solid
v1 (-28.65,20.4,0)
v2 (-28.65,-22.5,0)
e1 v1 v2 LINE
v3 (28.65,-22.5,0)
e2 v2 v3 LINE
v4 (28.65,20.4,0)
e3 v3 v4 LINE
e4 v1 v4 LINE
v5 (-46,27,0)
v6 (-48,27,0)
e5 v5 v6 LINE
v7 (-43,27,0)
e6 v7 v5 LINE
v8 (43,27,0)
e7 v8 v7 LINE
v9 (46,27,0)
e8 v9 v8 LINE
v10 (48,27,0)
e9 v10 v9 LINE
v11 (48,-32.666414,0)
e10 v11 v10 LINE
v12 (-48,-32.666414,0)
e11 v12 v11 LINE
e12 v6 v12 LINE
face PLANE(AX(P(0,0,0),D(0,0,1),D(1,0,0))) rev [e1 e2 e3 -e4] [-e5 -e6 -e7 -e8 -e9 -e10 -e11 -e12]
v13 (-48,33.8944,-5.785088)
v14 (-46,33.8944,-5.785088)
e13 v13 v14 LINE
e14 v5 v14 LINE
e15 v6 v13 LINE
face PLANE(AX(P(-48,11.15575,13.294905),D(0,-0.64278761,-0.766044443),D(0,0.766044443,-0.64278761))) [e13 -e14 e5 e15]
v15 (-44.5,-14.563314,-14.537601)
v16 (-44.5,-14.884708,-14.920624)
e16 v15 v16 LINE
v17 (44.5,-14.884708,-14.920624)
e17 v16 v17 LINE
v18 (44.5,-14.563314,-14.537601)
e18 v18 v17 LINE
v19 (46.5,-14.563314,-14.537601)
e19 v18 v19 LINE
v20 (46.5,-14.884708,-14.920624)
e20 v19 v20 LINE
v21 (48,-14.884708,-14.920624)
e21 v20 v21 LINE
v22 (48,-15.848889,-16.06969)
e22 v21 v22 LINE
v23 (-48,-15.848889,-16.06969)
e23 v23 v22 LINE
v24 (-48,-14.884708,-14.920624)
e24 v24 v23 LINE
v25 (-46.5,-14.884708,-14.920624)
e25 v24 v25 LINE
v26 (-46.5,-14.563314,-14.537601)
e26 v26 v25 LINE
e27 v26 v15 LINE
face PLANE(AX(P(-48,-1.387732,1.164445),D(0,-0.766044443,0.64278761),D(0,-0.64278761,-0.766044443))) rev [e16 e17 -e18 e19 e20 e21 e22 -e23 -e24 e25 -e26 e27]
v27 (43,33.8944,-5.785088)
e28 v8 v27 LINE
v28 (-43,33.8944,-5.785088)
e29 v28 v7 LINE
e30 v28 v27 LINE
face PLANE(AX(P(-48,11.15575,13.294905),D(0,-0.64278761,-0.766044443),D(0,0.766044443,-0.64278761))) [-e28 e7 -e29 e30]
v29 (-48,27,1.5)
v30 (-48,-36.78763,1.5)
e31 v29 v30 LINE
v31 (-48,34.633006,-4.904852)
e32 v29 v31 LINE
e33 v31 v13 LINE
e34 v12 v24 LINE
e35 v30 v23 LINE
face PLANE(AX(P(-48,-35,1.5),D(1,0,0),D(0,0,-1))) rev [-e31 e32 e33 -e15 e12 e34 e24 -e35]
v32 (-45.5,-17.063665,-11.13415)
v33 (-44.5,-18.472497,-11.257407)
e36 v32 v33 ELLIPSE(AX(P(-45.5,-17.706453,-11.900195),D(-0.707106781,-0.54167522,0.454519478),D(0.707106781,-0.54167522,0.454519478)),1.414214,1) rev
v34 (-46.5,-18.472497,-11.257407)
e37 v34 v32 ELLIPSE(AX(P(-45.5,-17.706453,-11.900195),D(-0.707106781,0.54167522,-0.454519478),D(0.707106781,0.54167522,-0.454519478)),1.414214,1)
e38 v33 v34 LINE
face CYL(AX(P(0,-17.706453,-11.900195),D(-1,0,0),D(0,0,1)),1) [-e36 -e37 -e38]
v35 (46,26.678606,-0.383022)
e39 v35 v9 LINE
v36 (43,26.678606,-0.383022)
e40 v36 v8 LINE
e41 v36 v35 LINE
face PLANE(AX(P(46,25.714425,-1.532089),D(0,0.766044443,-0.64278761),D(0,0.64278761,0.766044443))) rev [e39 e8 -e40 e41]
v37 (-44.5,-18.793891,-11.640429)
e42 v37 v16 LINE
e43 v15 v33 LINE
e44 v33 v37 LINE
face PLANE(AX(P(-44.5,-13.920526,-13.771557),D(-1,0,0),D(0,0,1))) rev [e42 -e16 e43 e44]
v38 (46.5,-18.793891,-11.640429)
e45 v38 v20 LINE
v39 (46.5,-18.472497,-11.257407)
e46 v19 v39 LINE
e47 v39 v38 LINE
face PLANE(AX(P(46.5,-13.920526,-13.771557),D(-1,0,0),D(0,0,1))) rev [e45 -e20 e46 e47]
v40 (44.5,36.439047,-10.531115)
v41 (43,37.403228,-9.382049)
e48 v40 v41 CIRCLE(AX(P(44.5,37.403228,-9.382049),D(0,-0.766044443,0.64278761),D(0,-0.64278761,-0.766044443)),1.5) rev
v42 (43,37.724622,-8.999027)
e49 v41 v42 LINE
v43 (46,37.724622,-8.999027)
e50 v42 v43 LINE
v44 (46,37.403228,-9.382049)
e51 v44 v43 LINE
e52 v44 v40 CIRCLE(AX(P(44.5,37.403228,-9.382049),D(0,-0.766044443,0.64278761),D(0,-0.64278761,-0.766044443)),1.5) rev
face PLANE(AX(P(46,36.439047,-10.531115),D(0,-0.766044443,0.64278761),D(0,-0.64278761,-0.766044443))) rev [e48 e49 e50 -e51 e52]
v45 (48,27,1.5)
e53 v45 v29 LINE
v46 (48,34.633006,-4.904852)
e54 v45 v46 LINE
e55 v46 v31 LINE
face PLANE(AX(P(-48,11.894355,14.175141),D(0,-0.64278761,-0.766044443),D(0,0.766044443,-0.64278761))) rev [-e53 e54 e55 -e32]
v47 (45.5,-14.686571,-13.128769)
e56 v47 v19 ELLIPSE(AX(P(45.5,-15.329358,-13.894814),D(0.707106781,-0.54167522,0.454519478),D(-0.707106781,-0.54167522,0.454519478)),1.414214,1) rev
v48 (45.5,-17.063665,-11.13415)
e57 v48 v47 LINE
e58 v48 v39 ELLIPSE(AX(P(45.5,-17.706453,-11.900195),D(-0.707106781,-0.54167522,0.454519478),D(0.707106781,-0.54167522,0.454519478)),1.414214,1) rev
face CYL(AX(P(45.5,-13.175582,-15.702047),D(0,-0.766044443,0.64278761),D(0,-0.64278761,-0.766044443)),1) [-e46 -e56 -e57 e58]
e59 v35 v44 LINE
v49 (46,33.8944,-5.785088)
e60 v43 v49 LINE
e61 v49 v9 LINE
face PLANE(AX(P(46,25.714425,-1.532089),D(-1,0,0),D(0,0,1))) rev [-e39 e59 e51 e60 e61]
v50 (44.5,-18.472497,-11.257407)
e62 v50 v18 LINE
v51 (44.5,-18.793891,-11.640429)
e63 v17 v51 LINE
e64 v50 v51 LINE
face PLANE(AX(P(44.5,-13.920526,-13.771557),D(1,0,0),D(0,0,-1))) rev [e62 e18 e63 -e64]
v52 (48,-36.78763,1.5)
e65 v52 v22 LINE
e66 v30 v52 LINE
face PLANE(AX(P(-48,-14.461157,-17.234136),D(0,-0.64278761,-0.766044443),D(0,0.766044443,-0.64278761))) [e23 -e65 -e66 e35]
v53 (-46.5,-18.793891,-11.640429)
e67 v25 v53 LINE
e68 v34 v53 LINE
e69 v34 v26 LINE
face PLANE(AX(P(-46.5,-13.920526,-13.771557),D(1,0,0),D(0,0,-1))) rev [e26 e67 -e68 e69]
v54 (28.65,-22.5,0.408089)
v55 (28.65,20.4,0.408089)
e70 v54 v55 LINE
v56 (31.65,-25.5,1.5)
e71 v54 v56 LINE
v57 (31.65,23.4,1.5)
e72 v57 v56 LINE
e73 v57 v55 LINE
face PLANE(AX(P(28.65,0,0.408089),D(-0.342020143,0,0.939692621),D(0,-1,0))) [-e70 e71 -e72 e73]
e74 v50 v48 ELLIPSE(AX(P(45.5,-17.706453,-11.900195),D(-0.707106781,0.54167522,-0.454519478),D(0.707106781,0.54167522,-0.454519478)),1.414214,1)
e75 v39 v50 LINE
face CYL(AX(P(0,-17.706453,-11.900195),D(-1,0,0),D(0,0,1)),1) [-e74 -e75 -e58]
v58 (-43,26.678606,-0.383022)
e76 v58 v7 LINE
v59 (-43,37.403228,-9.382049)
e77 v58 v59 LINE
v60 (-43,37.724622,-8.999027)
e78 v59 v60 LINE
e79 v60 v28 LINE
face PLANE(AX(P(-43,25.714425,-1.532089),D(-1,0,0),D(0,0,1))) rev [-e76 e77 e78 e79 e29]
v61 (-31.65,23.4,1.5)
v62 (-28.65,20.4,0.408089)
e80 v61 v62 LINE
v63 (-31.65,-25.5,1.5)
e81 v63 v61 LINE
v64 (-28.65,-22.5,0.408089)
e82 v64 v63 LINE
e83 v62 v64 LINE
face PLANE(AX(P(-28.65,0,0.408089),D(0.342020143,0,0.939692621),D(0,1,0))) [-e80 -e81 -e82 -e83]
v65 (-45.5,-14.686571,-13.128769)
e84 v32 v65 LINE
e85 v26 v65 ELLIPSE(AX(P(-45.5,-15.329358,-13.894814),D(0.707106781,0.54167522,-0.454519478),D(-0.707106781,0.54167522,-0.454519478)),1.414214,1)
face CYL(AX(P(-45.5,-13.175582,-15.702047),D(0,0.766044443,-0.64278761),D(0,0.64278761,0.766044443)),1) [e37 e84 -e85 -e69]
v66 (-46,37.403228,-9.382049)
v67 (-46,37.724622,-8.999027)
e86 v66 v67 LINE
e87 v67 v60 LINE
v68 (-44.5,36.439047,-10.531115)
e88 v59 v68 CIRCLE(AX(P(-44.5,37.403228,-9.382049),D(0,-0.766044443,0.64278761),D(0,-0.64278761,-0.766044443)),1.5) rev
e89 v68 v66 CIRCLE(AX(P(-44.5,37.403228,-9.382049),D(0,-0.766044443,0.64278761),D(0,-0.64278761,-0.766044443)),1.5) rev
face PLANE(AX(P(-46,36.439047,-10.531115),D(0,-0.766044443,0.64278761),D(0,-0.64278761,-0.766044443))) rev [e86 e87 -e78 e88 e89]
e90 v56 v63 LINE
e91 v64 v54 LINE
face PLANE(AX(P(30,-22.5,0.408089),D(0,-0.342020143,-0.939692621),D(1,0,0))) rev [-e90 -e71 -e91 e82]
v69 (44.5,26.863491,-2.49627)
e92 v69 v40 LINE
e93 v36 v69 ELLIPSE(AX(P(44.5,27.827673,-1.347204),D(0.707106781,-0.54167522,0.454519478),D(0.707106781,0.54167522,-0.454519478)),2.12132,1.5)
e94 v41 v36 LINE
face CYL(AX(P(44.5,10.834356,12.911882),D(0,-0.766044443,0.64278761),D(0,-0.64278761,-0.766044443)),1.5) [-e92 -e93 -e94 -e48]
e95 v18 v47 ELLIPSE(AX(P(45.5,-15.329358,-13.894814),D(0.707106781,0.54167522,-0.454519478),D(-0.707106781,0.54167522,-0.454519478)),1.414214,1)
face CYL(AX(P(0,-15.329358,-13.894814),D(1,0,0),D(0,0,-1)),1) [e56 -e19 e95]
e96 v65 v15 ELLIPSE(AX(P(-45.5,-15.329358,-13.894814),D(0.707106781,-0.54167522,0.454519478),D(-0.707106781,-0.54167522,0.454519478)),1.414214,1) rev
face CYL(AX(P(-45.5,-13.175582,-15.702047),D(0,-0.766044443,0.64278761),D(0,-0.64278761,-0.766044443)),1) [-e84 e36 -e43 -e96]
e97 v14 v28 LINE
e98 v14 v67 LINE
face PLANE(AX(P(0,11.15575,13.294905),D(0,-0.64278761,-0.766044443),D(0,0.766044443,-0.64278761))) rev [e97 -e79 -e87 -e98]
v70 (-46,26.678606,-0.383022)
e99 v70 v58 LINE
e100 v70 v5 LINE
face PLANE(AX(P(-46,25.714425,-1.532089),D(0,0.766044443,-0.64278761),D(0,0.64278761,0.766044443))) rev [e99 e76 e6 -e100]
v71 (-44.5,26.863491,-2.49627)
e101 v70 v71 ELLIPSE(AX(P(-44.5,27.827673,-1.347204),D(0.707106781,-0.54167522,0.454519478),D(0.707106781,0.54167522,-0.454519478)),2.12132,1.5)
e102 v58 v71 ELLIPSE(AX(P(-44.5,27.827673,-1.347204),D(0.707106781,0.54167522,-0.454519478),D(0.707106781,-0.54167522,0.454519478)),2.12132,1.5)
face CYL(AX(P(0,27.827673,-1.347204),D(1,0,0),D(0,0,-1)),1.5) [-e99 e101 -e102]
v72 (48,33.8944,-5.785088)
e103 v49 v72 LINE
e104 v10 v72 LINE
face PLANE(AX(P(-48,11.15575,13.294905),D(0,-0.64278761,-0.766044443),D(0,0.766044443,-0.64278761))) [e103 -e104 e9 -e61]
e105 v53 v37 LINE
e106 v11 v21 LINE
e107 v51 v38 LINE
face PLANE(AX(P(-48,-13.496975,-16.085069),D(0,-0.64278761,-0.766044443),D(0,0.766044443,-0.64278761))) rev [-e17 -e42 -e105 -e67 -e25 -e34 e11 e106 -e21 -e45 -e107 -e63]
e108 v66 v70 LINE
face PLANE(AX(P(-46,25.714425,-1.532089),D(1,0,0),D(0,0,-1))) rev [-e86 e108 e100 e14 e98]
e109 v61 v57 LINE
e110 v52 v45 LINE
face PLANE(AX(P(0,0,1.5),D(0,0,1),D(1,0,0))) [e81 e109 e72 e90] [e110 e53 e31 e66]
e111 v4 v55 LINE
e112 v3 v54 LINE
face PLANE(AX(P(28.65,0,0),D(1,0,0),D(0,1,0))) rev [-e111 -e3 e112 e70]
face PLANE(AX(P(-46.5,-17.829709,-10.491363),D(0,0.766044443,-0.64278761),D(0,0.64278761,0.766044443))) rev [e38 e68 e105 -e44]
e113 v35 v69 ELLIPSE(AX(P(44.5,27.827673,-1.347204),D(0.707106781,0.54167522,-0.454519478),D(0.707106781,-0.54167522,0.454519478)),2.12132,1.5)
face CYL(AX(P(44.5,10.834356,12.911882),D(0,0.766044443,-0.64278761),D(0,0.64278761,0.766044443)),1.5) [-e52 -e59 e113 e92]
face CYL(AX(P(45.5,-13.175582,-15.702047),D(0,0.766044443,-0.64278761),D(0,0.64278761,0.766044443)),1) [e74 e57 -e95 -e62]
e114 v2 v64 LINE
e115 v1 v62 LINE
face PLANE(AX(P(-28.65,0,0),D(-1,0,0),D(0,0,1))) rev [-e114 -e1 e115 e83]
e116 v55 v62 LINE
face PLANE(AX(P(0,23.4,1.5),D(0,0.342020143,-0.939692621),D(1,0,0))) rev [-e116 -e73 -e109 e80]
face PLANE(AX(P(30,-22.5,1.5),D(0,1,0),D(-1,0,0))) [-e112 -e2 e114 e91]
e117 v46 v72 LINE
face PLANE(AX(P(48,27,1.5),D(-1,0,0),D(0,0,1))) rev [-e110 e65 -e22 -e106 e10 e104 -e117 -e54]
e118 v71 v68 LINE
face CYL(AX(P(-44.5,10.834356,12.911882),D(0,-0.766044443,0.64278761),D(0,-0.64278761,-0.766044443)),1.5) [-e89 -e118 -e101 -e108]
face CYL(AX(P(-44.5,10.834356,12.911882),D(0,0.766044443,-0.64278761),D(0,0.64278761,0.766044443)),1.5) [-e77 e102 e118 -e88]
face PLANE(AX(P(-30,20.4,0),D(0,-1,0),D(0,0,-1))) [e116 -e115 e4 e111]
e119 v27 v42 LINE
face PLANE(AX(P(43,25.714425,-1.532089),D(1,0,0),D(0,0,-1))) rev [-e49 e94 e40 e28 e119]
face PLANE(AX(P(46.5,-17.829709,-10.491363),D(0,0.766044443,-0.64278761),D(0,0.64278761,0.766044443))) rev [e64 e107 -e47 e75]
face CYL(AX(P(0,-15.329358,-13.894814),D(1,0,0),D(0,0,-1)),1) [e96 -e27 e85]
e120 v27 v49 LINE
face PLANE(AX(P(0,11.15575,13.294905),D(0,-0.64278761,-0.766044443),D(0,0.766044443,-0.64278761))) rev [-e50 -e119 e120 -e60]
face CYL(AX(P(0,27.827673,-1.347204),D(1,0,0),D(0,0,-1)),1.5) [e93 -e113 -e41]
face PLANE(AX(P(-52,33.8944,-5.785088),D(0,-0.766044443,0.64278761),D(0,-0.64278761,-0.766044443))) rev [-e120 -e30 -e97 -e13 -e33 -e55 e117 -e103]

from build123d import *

# Parameters (mm, degrees)
SKETCH_1_W          = 60
SKETCH_1_H          = 45
EXTRUDE_1_DEPTH     = 1.5
EXTRUDE_2_DEPTH     = 96
SKETCH_4_W          = 60
SKETCH_4_H          = 2.1
EXTRUDE_3_DEPTH     = 1.5
EXTRUDE_4_DEPTH     = 1.5
CUT_EXTRUDE_2_DEPTH = 100
EXTRUDE_5_DEPTH     = 96
SKETCH_12_W         = 3
SKETCH_12_H         = 14
EXTRUDE_6_DEPTH     = 2
FILLET_1_R          = 1.5
SKETCH_13_W         = 2
SKETCH_13_H         = 5.103076436
EXTRUDE_7_DEPTH     = 1.5
FILLET_3_R          = 1
CHAMFER_3_SIZE      = 3
CHAMFER_3_SIZE2     = 1.091910703


with BuildPart() as part:
    # Эскиз1 → Бобышка-Вытянуть1 (new body)
    with BuildSketch(Plane.XY):
        Polygon((46, -35), (-46, -35), (-48, -35), (-48, -25), (-48, 25), (-48, 27), (-46, 27), (46, 27), (48, 27), (48, 25), (48, -25), (48, -35), align=None)
        Rectangle(SKETCH_1_W, SKETCH_1_H, mode=Mode.SUBTRACT)
    extrude(amount=EXTRUDE_1_DEPTH)

    # Эскиз2 → Бобышка-Вытянуть2 (add)
    with BuildSketch(Plane(origin=(48, 0, 0), x_dir=(0, 0, -1), z_dir=(1, 0, 0))):
        Polygon((8.78785553, 39.260588787), (9.668091663, 38.521982973), (0, 27), (-1.5, 27), align=None)
        Polygon((0, -32.66641426), (0, -35), (16.069690242, -15.848888922), (14.920623577, -14.884707507), align=None)
    extrude(amount=-EXTRUDE_2_DEPTH)

    # Эскиз4 → Бобышка-Вытянуть3 (add)
    with BuildSketch(Plane.XY.offset(1.5)):
        with Locations((0, 21.45)):
            Rectangle(SKETCH_4_W, SKETCH_4_H)
    extrude(amount=-EXTRUDE_3_DEPTH)

    # Эскиз6 → Бобышка-Вытянуть4 (add)
    with BuildSketch(Plane.XY.offset(1.5)):
        Polygon((-28.65, -20.7), (-28.65, 20.4), (-30, 20.4), (-30, -22.5), (-28.65, -22.5), align=None)
        Polygon((28.65, 20.4), (28.65, -20.7), (28.65, -22.5), (30, -22.5), (30, 20.4), align=None)
    extrude(amount=-EXTRUDE_4_DEPTH)

    # Эскиз8 → Вырез-Вытянуть2 (cut)
    with BuildSketch(Plane(origin=(48, 0, 0), x_dir=(0, 0, -1), z_dir=(1, 0, 0))):
        Polygon((5.785088487, 33.894399988), (4.904852354, 34.633005803), (8.78785553, 39.260588787), (9.668091663, 38.521982973), align=None)
    extrude(amount=-CUT_EXTRUDE_2_DEPTH, mode=Mode.SUBTRACT)

    # Эскиз9 → Бобышка-Вытянуть5 (add)
    with BuildSketch(Plane(origin=(48, 0, 0), x_dir=(0, 0, -1), z_dir=(1, 0, 0))):
        Polygon((-1.5, -35), (-1.5, -36.787630389), (0, -35), align=None)
    extrude(amount=-EXTRUDE_5_DEPTH)

    # Эскиз12 → Бобышка-Вытянуть6 (add)
    with BuildSketch(Plane(origin=(0, 11.155749601, 13.294904666), x_dir=(-1, 0, 0), z_dir=(0, -0.6427876096865351, -0.7660444431189816))):
        with Locations((44.5, 27.683199964)):
            Rectangle(SKETCH_12_W, SKETCH_12_H)
        with Locations((-44.5, 27.683199964)):
            Rectangle(SKETCH_12_W, SKETCH_12_H)
    extrude(amount=EXTRUDE_6_DEPTH)

    # Скругление1
    fillet_1_edges = [part.edges().sort_by_distance(p)[0] for p in [
        (-43, 31.076735882, -6.031602154),
        (-46, 31.076735882, -6.031602154),
        (-44.5, 25.714424781, -1.532088886),
        (46, 31.076735882, -6.031602154),
        (43, 31.076735882, -6.031602154),
        (44.5, 25.714424781, -1.532088886),
    ]]
    fillet(fillet_1_edges, radius=FILLET_1_R - 0.0001)  # a hair under: the kernel refuses the full size

    # Эскиз13 → Бобышка-Вытянуть7 (add)
    with BuildSketch(Plane(origin=(0, -13.496975476, -16.085069013), x_dir=(1, 0, 0), z_dir=(0, 0.642787609686538, 0.7660444431189792))):
        with Locations((-45.5, -4.363093727)):
            Rectangle(SKETCH_13_W, SKETCH_13_H)
        with Locations((45.5, -4.363093727)):
            Rectangle(SKETCH_13_W, SKETCH_13_H)
    extrude(amount=EXTRUDE_7_DEPTH)

    # Скругление3
    fillet_3_edges = [part.edges().sort_by_distance(p)[0] for p in [
        (-46.5, -15.875117766, -12.131459761),
        (-45.5, -17.82970944, -10.491362608),
        (-44.5, -15.875117766, -12.131459761),
        (-45.5, -13.920526093, -13.771556913),
        (45.5, -13.920526093, -13.771556913),
        (44.5, -15.875117766, -12.131459761),
        (45.5, -17.82970944, -10.491362608),
        (46.5, -15.875117766, -12.131459761),
    ]]
    fillet(fillet_3_edges, radius=FILLET_3_R - 0.0001)  # a hair under: the kernel refuses the full size

    # Фаска3
    chamfer_3_edges = [part.edges().sort_by_distance(p)[0] for p in [
        (28.65, -1.05, 1.5),
        (0, 20.4, 1.5),
        (0, -22.5, 1.5),
        (-28.65, -1.05, 1.5),
    ]]
    chamfer_3_side = [part.faces().sort_by_distance(p)[0] for p in [
        (-46.847400252, -4.893815194, 1.5),
    ]]
    chamfer(chamfer_3_edges, length=CHAMFER_3_SIZE, length2=CHAMFER_3_SIZE2, reference=chamfer_3_side[0])


solid = part.part
